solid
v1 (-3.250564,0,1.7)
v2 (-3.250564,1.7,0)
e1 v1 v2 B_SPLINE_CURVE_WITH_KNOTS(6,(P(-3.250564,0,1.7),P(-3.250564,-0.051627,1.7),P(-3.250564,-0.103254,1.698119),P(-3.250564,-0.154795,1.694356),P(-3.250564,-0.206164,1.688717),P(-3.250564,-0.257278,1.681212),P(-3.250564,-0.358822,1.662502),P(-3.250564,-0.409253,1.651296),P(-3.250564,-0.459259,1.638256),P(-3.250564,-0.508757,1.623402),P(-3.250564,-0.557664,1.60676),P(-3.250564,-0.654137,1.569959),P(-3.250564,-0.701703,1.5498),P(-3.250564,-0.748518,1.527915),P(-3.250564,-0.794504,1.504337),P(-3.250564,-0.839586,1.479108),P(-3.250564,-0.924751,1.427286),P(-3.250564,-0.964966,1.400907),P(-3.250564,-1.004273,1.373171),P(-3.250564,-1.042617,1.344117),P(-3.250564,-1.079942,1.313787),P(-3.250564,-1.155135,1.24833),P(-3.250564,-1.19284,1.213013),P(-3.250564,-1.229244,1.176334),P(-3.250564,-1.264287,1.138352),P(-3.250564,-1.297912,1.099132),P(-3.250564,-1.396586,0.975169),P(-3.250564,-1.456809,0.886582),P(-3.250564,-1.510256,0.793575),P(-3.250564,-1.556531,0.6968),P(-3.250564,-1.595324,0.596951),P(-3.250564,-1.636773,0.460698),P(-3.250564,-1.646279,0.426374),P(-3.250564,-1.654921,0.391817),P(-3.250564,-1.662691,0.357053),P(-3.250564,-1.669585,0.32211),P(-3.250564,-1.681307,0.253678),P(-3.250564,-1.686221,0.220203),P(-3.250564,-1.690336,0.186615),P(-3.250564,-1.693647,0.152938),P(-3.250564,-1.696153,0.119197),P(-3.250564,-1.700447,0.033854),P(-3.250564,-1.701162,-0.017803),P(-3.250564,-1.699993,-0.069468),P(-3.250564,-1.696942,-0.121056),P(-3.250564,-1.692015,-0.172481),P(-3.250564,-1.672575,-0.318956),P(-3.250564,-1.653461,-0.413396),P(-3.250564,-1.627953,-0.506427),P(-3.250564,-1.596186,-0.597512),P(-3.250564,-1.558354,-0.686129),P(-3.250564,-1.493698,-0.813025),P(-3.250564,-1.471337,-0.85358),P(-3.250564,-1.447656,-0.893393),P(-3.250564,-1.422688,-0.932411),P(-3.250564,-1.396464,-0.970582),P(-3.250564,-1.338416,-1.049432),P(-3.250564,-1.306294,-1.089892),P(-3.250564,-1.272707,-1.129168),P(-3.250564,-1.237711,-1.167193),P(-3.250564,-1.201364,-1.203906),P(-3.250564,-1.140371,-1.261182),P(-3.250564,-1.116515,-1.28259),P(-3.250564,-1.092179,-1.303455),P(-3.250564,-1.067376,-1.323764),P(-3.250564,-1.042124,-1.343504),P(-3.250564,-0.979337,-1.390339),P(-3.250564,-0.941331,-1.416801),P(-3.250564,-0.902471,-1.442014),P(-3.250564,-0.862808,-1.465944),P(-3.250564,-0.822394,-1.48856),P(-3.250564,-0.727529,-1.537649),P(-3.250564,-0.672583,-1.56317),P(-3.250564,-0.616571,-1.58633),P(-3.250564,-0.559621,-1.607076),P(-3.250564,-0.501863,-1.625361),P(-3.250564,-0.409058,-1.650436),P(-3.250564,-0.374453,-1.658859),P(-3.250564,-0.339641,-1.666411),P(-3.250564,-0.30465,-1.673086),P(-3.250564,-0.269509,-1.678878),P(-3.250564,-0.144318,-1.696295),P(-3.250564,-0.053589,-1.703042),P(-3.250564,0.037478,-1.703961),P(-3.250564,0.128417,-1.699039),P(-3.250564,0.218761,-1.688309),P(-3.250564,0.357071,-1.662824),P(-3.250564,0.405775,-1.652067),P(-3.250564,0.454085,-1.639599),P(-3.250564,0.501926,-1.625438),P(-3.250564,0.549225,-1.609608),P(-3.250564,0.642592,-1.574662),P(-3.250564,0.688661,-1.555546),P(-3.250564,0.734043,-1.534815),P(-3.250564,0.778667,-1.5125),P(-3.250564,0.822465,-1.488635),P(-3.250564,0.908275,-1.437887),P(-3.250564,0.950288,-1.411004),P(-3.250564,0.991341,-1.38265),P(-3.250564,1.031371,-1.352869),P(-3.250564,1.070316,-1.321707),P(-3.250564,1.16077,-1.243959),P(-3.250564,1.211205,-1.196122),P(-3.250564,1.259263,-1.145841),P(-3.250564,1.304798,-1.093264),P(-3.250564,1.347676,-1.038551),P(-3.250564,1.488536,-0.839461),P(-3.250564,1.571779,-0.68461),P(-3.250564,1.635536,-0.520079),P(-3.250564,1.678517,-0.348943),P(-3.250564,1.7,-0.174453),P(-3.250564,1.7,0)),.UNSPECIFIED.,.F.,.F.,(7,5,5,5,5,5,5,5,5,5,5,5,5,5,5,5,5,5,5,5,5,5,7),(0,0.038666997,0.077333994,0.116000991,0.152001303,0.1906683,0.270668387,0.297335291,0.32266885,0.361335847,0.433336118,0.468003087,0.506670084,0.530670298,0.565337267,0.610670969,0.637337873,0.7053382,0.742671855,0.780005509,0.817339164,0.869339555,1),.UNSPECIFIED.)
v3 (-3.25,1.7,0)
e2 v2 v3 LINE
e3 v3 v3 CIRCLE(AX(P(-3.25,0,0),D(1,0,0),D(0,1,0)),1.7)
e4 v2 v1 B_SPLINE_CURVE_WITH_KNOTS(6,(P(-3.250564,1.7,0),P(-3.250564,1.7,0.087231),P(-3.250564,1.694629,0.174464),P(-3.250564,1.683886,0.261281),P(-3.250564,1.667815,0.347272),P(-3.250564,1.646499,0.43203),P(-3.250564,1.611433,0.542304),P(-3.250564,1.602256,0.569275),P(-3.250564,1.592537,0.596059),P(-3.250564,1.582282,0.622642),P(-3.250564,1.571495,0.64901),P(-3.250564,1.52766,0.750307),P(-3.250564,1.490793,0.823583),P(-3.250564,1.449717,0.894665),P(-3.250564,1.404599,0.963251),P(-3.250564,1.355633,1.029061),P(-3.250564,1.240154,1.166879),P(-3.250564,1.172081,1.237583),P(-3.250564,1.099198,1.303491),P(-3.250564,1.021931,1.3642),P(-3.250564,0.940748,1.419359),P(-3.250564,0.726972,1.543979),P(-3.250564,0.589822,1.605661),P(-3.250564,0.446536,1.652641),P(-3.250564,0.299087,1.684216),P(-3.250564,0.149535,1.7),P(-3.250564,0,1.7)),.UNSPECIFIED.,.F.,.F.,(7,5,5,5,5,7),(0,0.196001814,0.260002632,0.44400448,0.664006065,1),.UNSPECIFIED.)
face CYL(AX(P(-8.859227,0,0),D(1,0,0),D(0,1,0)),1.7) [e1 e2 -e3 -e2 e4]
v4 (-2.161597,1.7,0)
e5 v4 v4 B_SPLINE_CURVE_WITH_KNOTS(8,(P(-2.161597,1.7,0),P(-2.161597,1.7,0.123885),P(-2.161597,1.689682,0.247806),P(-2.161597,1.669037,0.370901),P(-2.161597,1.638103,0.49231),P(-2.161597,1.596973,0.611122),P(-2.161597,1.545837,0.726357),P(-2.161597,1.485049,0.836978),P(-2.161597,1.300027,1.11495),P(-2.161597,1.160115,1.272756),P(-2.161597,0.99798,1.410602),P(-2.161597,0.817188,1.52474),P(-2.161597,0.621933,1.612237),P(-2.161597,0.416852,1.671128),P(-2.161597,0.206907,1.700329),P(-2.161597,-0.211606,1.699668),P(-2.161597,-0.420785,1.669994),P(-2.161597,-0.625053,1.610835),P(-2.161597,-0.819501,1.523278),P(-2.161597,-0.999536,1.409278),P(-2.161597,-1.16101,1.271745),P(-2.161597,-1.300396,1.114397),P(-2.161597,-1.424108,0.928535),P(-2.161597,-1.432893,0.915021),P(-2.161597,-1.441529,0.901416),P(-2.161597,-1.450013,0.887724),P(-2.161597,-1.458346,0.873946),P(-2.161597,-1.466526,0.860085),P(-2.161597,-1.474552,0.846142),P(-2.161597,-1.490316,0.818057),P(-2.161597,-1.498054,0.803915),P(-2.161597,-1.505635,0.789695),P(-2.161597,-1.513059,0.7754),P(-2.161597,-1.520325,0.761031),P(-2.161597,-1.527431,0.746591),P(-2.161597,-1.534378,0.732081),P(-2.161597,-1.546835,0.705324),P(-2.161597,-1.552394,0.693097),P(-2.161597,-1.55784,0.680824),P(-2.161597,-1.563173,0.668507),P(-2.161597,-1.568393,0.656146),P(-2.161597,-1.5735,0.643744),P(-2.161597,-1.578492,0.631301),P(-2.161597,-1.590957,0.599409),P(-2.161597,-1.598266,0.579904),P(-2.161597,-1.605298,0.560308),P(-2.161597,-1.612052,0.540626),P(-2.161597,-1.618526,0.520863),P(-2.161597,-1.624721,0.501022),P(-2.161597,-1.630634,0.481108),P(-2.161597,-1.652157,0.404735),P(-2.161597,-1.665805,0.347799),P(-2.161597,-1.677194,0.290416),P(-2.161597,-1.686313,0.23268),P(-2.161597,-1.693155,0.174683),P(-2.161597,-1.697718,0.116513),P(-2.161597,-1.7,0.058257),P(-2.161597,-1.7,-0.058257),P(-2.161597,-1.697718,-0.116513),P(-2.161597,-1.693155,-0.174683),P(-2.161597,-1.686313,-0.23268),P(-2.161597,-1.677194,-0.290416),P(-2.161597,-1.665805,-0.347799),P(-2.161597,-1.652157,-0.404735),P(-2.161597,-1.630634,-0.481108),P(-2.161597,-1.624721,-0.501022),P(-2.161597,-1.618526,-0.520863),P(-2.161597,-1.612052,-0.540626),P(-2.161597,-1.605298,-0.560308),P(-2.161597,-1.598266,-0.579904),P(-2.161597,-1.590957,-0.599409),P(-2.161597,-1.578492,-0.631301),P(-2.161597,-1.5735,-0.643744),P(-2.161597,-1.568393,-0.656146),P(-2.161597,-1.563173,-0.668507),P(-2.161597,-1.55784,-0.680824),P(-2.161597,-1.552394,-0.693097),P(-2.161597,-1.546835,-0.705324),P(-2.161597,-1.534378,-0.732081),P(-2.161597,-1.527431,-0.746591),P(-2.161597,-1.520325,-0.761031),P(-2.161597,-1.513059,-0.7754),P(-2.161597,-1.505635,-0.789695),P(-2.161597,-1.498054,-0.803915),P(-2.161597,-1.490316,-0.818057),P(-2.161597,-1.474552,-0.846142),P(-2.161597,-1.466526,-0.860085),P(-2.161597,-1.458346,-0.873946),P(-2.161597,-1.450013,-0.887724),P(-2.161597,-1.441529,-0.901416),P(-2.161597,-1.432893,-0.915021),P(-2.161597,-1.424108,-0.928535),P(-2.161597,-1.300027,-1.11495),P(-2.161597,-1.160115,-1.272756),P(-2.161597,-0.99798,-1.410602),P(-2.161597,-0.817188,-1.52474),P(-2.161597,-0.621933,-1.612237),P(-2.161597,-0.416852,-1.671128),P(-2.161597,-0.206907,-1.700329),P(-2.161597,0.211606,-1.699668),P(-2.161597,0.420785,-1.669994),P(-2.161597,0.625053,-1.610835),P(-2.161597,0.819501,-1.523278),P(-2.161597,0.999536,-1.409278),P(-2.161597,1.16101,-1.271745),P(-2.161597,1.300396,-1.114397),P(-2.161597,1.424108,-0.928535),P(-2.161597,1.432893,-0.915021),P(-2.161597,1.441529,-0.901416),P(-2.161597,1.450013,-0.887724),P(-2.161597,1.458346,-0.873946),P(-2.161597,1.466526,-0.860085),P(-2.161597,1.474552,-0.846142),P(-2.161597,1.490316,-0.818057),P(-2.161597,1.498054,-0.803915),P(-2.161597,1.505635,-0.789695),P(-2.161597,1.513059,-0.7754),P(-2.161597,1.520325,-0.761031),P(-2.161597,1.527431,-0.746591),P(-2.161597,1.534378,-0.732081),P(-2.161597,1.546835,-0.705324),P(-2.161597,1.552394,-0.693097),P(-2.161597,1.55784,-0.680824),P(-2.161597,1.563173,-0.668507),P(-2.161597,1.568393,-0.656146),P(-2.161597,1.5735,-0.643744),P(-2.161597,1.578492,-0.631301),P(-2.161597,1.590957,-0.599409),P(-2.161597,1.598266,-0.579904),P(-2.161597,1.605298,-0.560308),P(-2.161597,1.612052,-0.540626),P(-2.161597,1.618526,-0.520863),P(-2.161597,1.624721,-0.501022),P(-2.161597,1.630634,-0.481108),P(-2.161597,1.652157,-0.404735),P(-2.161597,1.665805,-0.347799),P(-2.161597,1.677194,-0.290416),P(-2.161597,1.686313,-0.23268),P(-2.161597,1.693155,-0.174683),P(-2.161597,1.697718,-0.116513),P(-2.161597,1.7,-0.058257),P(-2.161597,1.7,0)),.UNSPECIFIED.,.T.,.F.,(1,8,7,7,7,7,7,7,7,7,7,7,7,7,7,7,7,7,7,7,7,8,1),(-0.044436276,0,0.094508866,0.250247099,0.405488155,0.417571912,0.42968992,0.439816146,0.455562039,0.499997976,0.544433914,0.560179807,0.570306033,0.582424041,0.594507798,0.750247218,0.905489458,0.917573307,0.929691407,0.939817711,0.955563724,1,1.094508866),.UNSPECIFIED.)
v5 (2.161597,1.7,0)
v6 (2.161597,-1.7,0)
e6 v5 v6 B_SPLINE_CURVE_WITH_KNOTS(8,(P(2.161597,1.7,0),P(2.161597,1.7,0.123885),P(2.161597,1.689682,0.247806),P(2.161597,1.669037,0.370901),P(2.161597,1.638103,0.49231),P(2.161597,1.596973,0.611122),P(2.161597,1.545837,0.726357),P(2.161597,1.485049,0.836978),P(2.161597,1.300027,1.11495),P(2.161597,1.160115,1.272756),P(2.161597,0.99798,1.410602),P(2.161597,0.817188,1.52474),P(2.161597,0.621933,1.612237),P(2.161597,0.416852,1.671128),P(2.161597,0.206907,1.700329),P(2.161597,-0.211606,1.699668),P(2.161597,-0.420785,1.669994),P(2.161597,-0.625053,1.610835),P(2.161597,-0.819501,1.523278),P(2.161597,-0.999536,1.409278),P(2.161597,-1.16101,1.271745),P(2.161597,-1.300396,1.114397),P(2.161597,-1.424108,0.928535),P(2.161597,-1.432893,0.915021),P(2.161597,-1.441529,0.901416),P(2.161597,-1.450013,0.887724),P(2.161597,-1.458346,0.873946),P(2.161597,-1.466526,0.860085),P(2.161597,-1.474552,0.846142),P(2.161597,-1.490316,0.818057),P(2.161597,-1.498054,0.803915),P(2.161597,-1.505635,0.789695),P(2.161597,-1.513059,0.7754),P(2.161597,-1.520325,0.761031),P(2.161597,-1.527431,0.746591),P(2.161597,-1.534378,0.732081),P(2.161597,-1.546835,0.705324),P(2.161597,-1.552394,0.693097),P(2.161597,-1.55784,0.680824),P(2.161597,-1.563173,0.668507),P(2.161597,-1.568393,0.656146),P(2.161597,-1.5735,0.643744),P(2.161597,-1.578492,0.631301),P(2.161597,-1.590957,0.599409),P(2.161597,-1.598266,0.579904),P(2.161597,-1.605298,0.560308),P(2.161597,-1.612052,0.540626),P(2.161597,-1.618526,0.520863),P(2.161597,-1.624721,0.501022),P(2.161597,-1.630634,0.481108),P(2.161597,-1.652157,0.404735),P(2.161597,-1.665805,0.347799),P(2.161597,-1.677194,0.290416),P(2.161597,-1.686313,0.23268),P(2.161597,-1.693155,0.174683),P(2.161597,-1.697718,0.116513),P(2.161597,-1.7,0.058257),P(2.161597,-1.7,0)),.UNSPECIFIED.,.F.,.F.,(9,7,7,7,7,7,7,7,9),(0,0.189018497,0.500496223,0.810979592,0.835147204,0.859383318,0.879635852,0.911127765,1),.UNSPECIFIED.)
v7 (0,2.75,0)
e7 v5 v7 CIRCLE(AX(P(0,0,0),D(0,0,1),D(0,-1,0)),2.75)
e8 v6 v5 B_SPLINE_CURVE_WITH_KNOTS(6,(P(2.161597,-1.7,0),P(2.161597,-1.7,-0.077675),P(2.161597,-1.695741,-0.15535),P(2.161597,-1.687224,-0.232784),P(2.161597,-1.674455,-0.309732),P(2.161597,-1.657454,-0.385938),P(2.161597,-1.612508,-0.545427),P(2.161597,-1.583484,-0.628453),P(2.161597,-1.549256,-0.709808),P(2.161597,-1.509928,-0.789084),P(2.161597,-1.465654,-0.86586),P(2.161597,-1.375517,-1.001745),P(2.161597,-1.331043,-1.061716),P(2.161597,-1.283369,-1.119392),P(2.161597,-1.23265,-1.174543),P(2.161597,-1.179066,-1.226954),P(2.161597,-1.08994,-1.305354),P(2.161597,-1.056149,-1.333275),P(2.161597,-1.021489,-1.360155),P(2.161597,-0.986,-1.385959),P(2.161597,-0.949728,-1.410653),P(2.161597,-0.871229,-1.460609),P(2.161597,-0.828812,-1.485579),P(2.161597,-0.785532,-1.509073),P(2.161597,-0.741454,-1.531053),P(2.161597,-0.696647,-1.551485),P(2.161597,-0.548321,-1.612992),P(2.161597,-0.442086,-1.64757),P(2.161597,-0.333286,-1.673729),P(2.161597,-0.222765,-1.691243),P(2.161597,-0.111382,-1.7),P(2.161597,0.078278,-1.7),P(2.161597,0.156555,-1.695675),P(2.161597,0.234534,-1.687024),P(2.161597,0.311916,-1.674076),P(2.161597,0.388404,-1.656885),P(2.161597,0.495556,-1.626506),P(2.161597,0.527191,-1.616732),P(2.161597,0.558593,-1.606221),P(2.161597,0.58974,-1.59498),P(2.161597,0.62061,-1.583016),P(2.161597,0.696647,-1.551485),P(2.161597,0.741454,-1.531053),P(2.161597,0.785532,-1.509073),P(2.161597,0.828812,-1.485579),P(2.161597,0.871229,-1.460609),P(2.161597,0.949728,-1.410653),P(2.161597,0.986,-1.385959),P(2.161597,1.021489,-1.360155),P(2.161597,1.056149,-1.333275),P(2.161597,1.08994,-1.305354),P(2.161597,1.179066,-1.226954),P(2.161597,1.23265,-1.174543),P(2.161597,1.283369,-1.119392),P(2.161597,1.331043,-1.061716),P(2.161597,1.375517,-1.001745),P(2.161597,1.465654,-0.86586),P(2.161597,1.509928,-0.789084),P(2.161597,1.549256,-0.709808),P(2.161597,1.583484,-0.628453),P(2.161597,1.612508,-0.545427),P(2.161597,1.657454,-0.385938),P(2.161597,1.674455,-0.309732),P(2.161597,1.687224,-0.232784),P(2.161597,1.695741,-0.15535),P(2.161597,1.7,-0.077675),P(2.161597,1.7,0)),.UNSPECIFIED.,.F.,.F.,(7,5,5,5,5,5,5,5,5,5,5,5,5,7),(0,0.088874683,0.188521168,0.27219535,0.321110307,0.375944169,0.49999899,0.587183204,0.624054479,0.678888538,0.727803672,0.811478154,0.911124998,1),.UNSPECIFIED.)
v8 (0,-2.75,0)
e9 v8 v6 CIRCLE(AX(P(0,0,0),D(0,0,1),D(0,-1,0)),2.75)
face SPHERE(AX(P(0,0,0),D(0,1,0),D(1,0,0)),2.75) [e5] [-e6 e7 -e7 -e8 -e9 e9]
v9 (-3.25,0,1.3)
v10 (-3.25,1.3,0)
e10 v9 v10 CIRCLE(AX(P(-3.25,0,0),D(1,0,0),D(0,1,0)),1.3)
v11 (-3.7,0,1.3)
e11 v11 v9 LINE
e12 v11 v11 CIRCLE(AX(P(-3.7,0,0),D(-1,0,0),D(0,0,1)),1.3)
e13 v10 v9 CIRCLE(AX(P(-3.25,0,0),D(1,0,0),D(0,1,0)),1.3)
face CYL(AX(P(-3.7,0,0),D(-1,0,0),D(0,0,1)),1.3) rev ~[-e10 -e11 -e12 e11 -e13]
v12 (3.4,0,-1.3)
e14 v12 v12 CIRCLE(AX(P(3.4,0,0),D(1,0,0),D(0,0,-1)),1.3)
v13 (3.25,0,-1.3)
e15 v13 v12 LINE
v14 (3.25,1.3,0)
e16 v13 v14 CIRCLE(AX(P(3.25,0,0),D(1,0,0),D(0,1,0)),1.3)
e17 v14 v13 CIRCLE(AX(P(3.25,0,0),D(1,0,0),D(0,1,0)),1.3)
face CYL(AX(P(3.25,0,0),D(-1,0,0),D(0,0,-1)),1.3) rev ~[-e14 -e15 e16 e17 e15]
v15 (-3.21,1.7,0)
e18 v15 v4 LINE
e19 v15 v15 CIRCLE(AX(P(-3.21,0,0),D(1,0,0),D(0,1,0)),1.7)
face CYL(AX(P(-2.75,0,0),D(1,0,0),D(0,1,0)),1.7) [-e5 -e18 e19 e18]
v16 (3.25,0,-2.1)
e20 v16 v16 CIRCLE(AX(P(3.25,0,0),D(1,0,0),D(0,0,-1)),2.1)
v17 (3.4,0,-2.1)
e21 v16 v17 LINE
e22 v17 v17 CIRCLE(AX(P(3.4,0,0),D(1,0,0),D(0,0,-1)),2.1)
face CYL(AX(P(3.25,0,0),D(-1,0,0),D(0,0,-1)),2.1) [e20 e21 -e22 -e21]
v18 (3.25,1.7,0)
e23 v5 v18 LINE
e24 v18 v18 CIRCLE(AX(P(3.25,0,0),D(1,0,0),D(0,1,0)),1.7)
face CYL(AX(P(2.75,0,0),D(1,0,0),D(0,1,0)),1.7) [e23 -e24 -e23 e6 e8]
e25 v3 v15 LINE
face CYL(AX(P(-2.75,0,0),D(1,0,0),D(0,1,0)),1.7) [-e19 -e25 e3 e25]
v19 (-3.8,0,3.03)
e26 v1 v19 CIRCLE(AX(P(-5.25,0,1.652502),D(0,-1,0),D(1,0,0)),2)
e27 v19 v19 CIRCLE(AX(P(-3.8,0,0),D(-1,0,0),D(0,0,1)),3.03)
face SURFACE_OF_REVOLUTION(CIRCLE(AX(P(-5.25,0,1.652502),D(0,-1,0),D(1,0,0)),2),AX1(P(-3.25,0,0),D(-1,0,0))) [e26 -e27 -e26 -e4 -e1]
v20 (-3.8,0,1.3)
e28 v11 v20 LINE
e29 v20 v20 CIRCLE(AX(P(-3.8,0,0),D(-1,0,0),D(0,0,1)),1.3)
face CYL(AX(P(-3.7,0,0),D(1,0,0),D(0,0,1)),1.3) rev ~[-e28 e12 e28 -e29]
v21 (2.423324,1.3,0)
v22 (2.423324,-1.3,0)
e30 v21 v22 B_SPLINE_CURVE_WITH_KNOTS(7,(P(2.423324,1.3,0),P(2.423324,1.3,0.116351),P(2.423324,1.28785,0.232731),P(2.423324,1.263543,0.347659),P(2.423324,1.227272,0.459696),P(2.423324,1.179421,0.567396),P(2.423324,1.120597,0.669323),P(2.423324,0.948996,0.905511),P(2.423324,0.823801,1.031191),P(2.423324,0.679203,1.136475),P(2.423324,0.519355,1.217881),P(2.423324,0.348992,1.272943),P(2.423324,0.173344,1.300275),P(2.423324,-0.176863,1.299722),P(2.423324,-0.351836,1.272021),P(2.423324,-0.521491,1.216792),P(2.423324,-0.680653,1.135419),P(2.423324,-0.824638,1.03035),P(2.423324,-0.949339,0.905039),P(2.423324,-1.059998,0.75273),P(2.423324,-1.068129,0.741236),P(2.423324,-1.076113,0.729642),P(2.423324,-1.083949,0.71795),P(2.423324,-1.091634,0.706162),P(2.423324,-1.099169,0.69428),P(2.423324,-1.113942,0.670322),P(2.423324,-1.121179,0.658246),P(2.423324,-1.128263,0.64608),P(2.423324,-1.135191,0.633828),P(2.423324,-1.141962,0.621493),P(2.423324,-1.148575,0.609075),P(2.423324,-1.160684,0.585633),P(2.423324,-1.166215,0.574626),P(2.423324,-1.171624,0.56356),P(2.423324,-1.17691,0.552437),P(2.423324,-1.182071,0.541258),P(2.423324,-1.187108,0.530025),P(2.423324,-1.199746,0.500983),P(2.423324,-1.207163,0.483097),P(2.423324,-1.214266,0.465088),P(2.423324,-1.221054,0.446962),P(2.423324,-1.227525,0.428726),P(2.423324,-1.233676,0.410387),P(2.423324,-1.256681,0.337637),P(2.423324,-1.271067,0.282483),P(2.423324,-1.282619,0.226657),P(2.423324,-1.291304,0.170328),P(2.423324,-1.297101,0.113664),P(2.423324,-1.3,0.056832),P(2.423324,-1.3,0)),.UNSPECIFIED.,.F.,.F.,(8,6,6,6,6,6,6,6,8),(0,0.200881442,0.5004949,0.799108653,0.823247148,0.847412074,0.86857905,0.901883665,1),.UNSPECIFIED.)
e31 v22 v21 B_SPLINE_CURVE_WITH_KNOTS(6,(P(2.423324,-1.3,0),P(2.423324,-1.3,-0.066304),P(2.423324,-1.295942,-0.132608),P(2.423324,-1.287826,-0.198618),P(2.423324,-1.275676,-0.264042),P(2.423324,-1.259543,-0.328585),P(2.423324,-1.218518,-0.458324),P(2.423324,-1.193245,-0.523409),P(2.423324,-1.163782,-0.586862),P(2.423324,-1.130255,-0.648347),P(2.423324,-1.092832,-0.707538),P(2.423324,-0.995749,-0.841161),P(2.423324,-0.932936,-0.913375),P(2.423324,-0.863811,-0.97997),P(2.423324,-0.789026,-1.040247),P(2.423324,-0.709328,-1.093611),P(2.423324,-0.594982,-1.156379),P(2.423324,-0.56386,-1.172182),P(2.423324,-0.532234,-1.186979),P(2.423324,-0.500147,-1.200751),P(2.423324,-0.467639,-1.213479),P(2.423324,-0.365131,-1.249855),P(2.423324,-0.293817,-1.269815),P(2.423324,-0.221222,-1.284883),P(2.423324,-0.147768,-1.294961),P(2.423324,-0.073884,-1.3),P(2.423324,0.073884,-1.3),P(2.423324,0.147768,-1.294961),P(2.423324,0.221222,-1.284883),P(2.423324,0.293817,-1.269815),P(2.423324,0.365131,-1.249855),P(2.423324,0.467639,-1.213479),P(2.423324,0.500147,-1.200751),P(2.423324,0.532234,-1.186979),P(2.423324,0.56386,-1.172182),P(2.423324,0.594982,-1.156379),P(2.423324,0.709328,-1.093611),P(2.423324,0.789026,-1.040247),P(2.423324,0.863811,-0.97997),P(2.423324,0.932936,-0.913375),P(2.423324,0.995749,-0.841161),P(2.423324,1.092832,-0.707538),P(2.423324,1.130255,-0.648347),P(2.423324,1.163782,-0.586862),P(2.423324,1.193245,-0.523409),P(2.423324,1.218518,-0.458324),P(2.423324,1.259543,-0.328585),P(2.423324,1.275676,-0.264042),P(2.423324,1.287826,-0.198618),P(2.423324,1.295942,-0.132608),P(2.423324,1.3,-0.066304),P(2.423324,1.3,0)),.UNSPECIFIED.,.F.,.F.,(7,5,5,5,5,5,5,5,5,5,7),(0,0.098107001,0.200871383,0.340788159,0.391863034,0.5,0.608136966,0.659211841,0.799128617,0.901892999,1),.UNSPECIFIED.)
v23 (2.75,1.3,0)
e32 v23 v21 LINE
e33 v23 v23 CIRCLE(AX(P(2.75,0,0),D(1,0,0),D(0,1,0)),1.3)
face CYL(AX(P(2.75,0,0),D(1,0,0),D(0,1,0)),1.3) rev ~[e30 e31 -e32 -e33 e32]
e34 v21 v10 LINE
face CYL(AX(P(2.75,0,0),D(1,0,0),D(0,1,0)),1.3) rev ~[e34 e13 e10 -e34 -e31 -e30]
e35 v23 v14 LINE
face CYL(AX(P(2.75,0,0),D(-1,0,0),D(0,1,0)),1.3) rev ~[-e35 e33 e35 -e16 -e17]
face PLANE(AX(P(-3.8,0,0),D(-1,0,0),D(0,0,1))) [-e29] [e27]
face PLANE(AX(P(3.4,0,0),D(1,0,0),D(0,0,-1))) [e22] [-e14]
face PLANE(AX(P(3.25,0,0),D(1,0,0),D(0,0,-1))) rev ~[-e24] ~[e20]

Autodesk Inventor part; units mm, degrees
sketch "Boceto1" plane through (0, 0, 0) normal (0, 0, 1) x (1, 0, 0)
  arc A0 (0, -2.75) -> (0, 2.75) centre (0, 0) ccw
  line L0 (0, 2.75) -> (0, -2.75)
  dimension "d0" = 5.5
revolve "Revolución1" add sketch "Boceto1" angle 360 about axis through (0, 2.75, 0) along (0, -1, 0)
ref_plane "Plano de trabajo2" through (2.75, 0, 0) normal (1, 0, 0) x (0, 1, 0)
ref_plane "Plano de trabajo3" through (-2.75, 0, 0) normal (1, 0, 0) x (0, 1, 0)
sketch "Boceto7" plane through (2.75, 0, 0) normal (1, 0, 0) x (0, 1, 0)
  circle A0 centre (0, 0) radius 1.7
  circle A1 centre (0, 0) radius 1.3
  dimension "d21" = 3.4
  dimension "d22" = 0.4
extrude "Extrusión5" add sketch "Boceto7" along normal blind 0.5 and the other way blind 1
sketch "Boceto8" plane through (-2.75, 0, 0) normal (1, 0, 0) x (0, 1, 0)
  circle A0 centre (0, 0) radius 1.7
  circle A1 centre (0, 0) radius 1.7 projected
  circle A2 centre (0, 0) radius 1.3
  dimension "d27" = 3.4
  dimension "d35" = 2.6
extrude "Extrusión6" add sketch "Boceto8" along normal blind 1 and the other way blind 0.5 contours A0 | A2
ref_plane "Plano de trabajo6" through (2.75, 0, 0) normal (1, 0, 0) x (0, 1, 0)
sketch "Boceto10" plane through (2.75, 0, 0) normal (1, 0, 0) x (0, 1, 0)
  circle A0 centre (0, 0) radius 1.3 projected
extrude "Extrusión8" cut sketch "Boceto10" against normal blind 10
ref_plane "Plano de trabajo7" through (3.25, 0, 0) normal (1, 0, 0) x (0, 0, -1)
sketch "Boceto11" plane through (3.25, 0, 0) normal (1, 0, 0) x (0, 0, -1)
  circle A0 centre (0, 0) radius 2.1
  circle A1 centre (0, 0) radius 1.3 projected
  dimension "d39" = 4.2
extrude "Extrusión9" add sketch "Boceto11" along normal blind 0.15
ref_plane "Plano de trabajo9" through (-3.7, 0, 0) normal (-1, 0, 0) x (0, 0, 1)
ref_plane "Plano de trabajo8" through (-3.25, 0, 0) normal (-1, 0, 0) x (0, 0, 1)
sketch "Boceto12" plane through (-3.7, 0, 0) normal (-1, 0, 0) x (0, 0, 1)
  circle A0 centre (0, 0) radius 3.03
  circle A1 centre (0, 0) radius 1.3 projected
  dimension "d44" = 6.06
extrude "Extrusión10" add sketch "Boceto12" along normal blind 0.1 and the other way blind 0.45
fillet "Empalme1" radius 2 1 edges at (-3.25, 0, -3.03)
properties part number "Bola grande" material "Aluminio 6061"
